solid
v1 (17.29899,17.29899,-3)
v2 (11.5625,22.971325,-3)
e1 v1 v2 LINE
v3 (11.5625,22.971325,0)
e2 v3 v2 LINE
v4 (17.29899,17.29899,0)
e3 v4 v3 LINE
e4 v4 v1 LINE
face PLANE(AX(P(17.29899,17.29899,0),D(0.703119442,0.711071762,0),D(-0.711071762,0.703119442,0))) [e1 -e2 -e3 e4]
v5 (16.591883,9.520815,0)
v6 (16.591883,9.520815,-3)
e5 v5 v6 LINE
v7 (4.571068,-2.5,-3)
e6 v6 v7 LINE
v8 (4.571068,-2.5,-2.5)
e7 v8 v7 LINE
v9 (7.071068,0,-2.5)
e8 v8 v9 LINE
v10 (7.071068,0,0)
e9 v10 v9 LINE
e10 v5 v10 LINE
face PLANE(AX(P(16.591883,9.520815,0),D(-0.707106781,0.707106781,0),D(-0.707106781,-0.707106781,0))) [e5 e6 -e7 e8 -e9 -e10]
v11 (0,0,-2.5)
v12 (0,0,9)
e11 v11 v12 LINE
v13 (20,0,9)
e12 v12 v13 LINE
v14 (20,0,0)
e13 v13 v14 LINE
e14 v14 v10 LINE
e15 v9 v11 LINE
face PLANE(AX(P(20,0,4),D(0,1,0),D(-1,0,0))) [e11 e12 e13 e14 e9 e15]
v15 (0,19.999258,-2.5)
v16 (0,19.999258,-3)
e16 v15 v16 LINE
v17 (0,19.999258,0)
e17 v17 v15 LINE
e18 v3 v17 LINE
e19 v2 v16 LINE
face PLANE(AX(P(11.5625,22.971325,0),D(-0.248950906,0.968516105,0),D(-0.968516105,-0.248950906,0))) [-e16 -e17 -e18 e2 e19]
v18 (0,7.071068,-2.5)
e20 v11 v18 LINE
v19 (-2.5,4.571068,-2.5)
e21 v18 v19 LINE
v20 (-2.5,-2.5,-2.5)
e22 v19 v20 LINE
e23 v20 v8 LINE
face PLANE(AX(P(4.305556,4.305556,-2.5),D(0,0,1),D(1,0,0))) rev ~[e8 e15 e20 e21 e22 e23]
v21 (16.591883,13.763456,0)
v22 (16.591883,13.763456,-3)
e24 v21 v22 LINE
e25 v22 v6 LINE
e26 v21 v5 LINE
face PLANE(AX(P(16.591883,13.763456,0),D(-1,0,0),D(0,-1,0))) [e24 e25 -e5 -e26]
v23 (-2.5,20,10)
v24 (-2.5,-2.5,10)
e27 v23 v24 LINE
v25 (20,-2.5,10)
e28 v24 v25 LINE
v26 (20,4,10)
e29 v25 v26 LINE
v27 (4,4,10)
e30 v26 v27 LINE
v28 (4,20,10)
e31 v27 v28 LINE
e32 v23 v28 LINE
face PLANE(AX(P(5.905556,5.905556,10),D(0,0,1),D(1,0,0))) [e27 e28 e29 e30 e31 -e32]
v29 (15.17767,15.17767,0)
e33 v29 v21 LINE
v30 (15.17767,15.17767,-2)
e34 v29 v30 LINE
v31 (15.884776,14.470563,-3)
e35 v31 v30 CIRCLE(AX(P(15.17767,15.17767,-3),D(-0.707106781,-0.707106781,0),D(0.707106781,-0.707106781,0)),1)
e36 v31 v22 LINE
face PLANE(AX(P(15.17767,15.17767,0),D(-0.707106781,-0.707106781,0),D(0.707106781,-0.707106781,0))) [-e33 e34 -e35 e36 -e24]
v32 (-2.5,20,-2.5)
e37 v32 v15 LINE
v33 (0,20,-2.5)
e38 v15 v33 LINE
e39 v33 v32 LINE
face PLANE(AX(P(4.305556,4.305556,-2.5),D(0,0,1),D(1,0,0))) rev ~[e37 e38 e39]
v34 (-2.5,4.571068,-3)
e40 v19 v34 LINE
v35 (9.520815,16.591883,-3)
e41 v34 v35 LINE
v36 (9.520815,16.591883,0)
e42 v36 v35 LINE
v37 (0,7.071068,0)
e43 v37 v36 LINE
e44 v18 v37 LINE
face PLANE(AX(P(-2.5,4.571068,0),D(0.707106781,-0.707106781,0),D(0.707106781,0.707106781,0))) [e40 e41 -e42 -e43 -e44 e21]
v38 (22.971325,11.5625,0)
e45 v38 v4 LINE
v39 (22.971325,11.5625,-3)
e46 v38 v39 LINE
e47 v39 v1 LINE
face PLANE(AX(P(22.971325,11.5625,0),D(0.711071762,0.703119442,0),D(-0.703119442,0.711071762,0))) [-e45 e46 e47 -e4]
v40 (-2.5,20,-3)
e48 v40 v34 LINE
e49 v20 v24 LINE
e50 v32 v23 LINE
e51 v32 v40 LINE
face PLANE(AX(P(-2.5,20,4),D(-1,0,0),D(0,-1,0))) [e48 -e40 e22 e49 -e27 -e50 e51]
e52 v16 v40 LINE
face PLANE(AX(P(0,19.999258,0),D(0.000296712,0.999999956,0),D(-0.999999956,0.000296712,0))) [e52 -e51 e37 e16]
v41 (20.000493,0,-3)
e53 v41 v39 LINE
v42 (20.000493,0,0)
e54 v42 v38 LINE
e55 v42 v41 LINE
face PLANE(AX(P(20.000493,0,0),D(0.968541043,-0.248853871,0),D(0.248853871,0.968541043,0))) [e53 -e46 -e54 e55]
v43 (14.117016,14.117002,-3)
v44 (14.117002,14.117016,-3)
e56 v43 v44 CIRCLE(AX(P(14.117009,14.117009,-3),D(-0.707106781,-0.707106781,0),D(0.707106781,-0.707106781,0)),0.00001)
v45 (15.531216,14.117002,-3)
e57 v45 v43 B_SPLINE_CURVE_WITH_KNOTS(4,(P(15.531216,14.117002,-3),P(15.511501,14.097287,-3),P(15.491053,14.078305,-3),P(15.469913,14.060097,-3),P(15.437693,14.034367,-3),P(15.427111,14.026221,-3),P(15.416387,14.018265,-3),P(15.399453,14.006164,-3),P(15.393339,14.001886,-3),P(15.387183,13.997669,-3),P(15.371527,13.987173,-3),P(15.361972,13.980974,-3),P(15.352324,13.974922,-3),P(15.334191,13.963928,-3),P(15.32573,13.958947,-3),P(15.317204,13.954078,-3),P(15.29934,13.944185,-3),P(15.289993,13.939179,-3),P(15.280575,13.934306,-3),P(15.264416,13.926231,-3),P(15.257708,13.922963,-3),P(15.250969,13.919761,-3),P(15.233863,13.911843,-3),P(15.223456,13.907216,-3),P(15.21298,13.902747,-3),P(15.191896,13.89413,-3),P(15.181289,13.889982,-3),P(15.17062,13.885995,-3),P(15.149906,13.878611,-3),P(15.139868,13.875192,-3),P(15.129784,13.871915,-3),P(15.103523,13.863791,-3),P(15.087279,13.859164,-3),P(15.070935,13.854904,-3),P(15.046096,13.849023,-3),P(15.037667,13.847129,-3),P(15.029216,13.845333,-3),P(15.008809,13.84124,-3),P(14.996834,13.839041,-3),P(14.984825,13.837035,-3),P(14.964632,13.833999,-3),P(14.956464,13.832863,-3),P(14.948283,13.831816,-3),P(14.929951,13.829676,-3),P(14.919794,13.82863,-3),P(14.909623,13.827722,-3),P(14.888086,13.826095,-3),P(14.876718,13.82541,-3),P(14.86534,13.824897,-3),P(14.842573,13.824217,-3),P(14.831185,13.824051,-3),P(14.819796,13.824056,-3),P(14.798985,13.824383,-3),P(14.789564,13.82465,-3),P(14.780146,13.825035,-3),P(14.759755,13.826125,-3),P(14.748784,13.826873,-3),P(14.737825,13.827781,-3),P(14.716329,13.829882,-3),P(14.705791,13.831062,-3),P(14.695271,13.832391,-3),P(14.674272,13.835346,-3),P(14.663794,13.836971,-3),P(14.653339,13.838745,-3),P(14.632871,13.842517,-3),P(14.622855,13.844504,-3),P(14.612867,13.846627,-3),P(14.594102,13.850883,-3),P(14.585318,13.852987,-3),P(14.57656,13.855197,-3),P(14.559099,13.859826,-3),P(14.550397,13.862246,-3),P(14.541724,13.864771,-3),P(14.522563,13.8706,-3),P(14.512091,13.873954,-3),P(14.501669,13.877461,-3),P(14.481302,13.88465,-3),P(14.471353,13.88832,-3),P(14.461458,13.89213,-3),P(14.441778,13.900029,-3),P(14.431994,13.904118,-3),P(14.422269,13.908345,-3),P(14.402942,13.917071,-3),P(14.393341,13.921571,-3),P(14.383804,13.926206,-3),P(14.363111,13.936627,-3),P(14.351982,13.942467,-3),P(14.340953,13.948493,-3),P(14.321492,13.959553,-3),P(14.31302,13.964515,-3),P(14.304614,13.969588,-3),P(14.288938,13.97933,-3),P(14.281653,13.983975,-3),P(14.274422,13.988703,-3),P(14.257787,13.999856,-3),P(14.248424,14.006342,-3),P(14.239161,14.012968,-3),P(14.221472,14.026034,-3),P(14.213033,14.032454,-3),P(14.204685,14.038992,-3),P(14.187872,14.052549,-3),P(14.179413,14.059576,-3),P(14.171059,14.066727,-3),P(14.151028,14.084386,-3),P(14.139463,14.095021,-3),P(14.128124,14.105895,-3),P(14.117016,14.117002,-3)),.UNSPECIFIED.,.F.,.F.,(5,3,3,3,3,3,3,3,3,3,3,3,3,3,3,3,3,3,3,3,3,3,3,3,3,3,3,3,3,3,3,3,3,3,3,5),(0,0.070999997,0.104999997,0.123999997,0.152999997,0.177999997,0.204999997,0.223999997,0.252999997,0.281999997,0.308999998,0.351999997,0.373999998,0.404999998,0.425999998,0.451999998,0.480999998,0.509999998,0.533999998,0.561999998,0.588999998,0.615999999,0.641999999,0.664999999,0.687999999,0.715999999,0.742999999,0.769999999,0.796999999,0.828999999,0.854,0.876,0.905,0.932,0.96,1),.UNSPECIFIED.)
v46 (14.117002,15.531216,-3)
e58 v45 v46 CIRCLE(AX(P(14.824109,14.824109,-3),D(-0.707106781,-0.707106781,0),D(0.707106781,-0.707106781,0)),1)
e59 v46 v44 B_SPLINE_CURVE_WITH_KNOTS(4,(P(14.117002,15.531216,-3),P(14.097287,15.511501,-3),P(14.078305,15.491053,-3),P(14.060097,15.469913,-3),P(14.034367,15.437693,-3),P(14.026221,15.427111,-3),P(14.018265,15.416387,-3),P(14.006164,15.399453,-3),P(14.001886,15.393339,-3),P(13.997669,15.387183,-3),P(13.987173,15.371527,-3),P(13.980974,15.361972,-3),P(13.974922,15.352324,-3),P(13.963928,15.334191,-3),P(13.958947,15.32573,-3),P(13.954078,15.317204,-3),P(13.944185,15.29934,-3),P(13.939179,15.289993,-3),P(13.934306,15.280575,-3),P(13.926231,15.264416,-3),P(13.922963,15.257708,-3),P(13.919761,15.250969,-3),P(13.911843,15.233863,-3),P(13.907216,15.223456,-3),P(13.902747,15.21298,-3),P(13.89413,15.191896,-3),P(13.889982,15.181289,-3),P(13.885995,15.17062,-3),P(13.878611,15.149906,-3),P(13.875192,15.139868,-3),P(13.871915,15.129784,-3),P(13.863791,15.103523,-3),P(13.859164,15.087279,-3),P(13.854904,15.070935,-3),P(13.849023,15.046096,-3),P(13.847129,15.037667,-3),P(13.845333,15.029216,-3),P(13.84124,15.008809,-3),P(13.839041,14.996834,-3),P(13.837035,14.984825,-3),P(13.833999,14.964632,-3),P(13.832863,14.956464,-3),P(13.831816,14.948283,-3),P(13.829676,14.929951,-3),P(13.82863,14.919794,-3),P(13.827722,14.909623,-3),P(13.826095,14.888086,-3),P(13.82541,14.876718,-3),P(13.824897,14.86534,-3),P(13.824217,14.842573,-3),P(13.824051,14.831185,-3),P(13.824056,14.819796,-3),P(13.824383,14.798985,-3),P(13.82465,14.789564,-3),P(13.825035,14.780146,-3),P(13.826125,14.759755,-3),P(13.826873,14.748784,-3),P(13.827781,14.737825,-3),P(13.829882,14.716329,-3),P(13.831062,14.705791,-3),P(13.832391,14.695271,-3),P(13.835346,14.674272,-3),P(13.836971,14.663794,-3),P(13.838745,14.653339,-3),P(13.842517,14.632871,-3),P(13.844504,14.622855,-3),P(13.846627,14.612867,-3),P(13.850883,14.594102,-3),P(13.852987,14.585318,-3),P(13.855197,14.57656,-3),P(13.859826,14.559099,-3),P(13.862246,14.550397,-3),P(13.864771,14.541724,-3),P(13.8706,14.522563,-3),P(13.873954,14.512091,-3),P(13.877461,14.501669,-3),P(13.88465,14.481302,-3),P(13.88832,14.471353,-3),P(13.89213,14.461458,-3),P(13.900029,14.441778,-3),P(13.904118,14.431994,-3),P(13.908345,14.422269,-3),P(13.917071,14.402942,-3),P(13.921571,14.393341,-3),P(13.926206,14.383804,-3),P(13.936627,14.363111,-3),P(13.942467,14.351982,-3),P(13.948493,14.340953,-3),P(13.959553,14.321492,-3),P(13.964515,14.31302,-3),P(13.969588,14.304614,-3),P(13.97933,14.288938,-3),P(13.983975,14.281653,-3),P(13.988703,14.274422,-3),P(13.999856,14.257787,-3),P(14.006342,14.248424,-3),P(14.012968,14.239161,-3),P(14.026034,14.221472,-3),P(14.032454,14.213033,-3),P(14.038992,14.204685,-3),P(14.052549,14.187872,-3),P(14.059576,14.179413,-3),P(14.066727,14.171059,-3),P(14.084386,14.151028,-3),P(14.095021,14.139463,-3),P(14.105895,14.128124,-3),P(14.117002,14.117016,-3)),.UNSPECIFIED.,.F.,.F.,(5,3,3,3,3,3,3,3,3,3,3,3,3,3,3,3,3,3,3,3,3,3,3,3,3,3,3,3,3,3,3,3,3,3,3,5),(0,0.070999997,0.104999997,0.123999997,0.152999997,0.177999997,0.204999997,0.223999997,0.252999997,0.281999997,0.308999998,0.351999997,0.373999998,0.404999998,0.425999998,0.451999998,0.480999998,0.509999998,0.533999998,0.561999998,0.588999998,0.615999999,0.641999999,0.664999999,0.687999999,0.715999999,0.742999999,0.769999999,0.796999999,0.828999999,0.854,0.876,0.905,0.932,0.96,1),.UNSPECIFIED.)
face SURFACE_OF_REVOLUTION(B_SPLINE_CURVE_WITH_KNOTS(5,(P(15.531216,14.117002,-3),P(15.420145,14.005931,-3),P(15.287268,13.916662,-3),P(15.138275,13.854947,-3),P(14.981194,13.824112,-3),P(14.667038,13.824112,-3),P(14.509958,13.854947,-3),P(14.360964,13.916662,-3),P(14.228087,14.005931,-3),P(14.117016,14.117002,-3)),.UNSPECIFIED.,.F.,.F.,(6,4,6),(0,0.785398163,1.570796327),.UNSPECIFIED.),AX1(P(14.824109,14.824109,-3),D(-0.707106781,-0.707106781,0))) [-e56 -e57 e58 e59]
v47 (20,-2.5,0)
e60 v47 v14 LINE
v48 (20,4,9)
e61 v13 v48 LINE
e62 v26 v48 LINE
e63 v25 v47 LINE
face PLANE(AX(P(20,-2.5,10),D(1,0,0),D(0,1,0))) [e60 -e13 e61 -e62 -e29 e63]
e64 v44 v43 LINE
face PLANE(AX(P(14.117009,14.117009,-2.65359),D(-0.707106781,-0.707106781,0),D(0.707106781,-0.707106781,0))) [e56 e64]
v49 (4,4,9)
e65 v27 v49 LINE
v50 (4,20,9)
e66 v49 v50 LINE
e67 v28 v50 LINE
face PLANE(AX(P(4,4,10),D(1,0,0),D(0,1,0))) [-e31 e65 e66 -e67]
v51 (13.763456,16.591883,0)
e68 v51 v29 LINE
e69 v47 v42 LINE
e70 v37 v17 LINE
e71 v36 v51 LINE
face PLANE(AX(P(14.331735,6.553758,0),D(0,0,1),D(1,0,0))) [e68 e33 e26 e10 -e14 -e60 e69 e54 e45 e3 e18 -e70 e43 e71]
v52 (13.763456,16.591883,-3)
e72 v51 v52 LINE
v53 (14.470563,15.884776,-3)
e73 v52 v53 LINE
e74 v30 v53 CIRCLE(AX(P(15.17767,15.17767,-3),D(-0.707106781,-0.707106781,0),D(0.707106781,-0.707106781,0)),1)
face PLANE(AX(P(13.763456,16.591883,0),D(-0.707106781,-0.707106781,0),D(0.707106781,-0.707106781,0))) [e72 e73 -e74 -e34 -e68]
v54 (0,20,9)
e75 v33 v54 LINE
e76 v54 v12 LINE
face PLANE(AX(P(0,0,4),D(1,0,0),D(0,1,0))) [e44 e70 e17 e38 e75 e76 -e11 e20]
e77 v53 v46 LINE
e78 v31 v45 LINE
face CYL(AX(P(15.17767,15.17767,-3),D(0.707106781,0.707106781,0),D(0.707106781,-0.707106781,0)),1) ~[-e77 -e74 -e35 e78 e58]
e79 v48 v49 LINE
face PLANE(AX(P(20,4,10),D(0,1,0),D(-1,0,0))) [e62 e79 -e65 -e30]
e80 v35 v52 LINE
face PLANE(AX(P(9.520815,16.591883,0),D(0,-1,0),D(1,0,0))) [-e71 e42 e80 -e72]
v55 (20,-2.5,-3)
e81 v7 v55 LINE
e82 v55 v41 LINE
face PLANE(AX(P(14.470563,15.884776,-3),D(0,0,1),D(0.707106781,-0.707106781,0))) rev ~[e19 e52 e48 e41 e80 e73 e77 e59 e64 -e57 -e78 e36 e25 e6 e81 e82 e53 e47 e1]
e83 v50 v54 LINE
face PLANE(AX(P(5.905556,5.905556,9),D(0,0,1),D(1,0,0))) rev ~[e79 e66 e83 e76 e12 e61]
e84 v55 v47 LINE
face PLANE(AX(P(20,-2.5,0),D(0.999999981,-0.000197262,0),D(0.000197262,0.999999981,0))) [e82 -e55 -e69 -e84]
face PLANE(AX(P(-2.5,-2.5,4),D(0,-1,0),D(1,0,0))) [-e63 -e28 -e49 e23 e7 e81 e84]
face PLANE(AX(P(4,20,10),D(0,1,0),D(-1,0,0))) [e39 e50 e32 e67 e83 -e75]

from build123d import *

# Parameters (mm, degrees)
F2_DEPTH  = 6
F4_DEPTH  = 3
F5_DEPTH  = 6.5
F7_DEPTH  = 1.5
F8_R      = 0.99999
F10_DEPTH = 1


# Not quite as in the source:
# - a fillet or chamfer is up to 0.001 mm smaller than in the source, because OpenCascade refuses the exact size


with BuildPart() as f2:
    # F1 (on offset) → F2 (new body)
    with BuildSketch(Plane.XY.offset(4)):
        Polygon((20, 0), (0, 0), (0, 20), (-2.5, 20), (-2.5, -2.5), (20, -2.5), align=None)
    extrude(amount=F2_DEPTH)



with BuildPart() as f4:
    # F3 (on Top) → F4 (new body)
    with BuildSketch(Plane.XY):
        Polygon((16.591883092, 13.7634559673), (16.591883092, 9.5208152802), (4.5710678119, -2.5), (8.75, -2.5), (22.9713253162, 11.5625), (17.2989898732, 17.2989898732), (15.1776695297, 15.1776695297), align=None)
        Polygon((22.9713253162, 11.5625), (8.75, -2.5), (20, -2.5), (20.0004931539, 0), align=None)
        Polygon((13.7634559673, 16.591883092), (15.1776695297, 15.1776695297), (17.2989898732, 17.2989898732), (11.5625, 22.9713253162), (-2.5, 8.75), (-2.5, 4.5710678119), (9.5208152802, 16.591883092), align=None)
        Polygon((-2.5, 8.75), (11.5625, 22.9713253162), (0, 19.9992582202), (-2.5, 20), align=None)
    extrude(amount=-F4_DEPTH)


with BuildPart() as f2_1:
    add(f2.part)

    add(f4.part)  # F5 merges F4
    # F1 (on offset) → F5 (join)
    with BuildSketch(Plane.XY.offset(4)):
        Polygon((20, 0), (0, 0), (0, 20), (-2.5, 20), (-2.5, -2.5), (20, -2.5), align=None)
    extrude(amount=-F5_DEPTH)

    # F6 (on face) → F7 (join)
    with BuildSketch(Plane(origin=(15.1776695297, 15.1776695297, 0), x_dir=(0.7071067812, -0.7071067812, 0), z_dir=(-0.7071067812, -0.7071067812, 0))):
        with BuildLine():
            Line((-1, -3), (1, -3))
            ThreePointArc((1, -3), (0, -2), (-1, -3))
        make_face()
    extrude(amount=F7_DEPTH)

    # F8 (radius 1 in the source; OpenCascade refuses exactly that, so slightly less here)
    f8_edges = [f2_1.edges().sort_by_distance(p)[0] for p in [
        (14.117009, 14.117009, -2),
    ]]
    fillet(f8_edges, radius=F8_R)

    # F9 (on face) → F10 (join)
    with BuildSketch(Plane.XY.offset(10)):
        Polygon((4, 20), (-2.5, 20), (-2.5, -2.5), (20, -2.5), (20, 4), (4, 4), align=None)
    extrude(amount=-F10_DEPTH)


solid = f2_1.part
